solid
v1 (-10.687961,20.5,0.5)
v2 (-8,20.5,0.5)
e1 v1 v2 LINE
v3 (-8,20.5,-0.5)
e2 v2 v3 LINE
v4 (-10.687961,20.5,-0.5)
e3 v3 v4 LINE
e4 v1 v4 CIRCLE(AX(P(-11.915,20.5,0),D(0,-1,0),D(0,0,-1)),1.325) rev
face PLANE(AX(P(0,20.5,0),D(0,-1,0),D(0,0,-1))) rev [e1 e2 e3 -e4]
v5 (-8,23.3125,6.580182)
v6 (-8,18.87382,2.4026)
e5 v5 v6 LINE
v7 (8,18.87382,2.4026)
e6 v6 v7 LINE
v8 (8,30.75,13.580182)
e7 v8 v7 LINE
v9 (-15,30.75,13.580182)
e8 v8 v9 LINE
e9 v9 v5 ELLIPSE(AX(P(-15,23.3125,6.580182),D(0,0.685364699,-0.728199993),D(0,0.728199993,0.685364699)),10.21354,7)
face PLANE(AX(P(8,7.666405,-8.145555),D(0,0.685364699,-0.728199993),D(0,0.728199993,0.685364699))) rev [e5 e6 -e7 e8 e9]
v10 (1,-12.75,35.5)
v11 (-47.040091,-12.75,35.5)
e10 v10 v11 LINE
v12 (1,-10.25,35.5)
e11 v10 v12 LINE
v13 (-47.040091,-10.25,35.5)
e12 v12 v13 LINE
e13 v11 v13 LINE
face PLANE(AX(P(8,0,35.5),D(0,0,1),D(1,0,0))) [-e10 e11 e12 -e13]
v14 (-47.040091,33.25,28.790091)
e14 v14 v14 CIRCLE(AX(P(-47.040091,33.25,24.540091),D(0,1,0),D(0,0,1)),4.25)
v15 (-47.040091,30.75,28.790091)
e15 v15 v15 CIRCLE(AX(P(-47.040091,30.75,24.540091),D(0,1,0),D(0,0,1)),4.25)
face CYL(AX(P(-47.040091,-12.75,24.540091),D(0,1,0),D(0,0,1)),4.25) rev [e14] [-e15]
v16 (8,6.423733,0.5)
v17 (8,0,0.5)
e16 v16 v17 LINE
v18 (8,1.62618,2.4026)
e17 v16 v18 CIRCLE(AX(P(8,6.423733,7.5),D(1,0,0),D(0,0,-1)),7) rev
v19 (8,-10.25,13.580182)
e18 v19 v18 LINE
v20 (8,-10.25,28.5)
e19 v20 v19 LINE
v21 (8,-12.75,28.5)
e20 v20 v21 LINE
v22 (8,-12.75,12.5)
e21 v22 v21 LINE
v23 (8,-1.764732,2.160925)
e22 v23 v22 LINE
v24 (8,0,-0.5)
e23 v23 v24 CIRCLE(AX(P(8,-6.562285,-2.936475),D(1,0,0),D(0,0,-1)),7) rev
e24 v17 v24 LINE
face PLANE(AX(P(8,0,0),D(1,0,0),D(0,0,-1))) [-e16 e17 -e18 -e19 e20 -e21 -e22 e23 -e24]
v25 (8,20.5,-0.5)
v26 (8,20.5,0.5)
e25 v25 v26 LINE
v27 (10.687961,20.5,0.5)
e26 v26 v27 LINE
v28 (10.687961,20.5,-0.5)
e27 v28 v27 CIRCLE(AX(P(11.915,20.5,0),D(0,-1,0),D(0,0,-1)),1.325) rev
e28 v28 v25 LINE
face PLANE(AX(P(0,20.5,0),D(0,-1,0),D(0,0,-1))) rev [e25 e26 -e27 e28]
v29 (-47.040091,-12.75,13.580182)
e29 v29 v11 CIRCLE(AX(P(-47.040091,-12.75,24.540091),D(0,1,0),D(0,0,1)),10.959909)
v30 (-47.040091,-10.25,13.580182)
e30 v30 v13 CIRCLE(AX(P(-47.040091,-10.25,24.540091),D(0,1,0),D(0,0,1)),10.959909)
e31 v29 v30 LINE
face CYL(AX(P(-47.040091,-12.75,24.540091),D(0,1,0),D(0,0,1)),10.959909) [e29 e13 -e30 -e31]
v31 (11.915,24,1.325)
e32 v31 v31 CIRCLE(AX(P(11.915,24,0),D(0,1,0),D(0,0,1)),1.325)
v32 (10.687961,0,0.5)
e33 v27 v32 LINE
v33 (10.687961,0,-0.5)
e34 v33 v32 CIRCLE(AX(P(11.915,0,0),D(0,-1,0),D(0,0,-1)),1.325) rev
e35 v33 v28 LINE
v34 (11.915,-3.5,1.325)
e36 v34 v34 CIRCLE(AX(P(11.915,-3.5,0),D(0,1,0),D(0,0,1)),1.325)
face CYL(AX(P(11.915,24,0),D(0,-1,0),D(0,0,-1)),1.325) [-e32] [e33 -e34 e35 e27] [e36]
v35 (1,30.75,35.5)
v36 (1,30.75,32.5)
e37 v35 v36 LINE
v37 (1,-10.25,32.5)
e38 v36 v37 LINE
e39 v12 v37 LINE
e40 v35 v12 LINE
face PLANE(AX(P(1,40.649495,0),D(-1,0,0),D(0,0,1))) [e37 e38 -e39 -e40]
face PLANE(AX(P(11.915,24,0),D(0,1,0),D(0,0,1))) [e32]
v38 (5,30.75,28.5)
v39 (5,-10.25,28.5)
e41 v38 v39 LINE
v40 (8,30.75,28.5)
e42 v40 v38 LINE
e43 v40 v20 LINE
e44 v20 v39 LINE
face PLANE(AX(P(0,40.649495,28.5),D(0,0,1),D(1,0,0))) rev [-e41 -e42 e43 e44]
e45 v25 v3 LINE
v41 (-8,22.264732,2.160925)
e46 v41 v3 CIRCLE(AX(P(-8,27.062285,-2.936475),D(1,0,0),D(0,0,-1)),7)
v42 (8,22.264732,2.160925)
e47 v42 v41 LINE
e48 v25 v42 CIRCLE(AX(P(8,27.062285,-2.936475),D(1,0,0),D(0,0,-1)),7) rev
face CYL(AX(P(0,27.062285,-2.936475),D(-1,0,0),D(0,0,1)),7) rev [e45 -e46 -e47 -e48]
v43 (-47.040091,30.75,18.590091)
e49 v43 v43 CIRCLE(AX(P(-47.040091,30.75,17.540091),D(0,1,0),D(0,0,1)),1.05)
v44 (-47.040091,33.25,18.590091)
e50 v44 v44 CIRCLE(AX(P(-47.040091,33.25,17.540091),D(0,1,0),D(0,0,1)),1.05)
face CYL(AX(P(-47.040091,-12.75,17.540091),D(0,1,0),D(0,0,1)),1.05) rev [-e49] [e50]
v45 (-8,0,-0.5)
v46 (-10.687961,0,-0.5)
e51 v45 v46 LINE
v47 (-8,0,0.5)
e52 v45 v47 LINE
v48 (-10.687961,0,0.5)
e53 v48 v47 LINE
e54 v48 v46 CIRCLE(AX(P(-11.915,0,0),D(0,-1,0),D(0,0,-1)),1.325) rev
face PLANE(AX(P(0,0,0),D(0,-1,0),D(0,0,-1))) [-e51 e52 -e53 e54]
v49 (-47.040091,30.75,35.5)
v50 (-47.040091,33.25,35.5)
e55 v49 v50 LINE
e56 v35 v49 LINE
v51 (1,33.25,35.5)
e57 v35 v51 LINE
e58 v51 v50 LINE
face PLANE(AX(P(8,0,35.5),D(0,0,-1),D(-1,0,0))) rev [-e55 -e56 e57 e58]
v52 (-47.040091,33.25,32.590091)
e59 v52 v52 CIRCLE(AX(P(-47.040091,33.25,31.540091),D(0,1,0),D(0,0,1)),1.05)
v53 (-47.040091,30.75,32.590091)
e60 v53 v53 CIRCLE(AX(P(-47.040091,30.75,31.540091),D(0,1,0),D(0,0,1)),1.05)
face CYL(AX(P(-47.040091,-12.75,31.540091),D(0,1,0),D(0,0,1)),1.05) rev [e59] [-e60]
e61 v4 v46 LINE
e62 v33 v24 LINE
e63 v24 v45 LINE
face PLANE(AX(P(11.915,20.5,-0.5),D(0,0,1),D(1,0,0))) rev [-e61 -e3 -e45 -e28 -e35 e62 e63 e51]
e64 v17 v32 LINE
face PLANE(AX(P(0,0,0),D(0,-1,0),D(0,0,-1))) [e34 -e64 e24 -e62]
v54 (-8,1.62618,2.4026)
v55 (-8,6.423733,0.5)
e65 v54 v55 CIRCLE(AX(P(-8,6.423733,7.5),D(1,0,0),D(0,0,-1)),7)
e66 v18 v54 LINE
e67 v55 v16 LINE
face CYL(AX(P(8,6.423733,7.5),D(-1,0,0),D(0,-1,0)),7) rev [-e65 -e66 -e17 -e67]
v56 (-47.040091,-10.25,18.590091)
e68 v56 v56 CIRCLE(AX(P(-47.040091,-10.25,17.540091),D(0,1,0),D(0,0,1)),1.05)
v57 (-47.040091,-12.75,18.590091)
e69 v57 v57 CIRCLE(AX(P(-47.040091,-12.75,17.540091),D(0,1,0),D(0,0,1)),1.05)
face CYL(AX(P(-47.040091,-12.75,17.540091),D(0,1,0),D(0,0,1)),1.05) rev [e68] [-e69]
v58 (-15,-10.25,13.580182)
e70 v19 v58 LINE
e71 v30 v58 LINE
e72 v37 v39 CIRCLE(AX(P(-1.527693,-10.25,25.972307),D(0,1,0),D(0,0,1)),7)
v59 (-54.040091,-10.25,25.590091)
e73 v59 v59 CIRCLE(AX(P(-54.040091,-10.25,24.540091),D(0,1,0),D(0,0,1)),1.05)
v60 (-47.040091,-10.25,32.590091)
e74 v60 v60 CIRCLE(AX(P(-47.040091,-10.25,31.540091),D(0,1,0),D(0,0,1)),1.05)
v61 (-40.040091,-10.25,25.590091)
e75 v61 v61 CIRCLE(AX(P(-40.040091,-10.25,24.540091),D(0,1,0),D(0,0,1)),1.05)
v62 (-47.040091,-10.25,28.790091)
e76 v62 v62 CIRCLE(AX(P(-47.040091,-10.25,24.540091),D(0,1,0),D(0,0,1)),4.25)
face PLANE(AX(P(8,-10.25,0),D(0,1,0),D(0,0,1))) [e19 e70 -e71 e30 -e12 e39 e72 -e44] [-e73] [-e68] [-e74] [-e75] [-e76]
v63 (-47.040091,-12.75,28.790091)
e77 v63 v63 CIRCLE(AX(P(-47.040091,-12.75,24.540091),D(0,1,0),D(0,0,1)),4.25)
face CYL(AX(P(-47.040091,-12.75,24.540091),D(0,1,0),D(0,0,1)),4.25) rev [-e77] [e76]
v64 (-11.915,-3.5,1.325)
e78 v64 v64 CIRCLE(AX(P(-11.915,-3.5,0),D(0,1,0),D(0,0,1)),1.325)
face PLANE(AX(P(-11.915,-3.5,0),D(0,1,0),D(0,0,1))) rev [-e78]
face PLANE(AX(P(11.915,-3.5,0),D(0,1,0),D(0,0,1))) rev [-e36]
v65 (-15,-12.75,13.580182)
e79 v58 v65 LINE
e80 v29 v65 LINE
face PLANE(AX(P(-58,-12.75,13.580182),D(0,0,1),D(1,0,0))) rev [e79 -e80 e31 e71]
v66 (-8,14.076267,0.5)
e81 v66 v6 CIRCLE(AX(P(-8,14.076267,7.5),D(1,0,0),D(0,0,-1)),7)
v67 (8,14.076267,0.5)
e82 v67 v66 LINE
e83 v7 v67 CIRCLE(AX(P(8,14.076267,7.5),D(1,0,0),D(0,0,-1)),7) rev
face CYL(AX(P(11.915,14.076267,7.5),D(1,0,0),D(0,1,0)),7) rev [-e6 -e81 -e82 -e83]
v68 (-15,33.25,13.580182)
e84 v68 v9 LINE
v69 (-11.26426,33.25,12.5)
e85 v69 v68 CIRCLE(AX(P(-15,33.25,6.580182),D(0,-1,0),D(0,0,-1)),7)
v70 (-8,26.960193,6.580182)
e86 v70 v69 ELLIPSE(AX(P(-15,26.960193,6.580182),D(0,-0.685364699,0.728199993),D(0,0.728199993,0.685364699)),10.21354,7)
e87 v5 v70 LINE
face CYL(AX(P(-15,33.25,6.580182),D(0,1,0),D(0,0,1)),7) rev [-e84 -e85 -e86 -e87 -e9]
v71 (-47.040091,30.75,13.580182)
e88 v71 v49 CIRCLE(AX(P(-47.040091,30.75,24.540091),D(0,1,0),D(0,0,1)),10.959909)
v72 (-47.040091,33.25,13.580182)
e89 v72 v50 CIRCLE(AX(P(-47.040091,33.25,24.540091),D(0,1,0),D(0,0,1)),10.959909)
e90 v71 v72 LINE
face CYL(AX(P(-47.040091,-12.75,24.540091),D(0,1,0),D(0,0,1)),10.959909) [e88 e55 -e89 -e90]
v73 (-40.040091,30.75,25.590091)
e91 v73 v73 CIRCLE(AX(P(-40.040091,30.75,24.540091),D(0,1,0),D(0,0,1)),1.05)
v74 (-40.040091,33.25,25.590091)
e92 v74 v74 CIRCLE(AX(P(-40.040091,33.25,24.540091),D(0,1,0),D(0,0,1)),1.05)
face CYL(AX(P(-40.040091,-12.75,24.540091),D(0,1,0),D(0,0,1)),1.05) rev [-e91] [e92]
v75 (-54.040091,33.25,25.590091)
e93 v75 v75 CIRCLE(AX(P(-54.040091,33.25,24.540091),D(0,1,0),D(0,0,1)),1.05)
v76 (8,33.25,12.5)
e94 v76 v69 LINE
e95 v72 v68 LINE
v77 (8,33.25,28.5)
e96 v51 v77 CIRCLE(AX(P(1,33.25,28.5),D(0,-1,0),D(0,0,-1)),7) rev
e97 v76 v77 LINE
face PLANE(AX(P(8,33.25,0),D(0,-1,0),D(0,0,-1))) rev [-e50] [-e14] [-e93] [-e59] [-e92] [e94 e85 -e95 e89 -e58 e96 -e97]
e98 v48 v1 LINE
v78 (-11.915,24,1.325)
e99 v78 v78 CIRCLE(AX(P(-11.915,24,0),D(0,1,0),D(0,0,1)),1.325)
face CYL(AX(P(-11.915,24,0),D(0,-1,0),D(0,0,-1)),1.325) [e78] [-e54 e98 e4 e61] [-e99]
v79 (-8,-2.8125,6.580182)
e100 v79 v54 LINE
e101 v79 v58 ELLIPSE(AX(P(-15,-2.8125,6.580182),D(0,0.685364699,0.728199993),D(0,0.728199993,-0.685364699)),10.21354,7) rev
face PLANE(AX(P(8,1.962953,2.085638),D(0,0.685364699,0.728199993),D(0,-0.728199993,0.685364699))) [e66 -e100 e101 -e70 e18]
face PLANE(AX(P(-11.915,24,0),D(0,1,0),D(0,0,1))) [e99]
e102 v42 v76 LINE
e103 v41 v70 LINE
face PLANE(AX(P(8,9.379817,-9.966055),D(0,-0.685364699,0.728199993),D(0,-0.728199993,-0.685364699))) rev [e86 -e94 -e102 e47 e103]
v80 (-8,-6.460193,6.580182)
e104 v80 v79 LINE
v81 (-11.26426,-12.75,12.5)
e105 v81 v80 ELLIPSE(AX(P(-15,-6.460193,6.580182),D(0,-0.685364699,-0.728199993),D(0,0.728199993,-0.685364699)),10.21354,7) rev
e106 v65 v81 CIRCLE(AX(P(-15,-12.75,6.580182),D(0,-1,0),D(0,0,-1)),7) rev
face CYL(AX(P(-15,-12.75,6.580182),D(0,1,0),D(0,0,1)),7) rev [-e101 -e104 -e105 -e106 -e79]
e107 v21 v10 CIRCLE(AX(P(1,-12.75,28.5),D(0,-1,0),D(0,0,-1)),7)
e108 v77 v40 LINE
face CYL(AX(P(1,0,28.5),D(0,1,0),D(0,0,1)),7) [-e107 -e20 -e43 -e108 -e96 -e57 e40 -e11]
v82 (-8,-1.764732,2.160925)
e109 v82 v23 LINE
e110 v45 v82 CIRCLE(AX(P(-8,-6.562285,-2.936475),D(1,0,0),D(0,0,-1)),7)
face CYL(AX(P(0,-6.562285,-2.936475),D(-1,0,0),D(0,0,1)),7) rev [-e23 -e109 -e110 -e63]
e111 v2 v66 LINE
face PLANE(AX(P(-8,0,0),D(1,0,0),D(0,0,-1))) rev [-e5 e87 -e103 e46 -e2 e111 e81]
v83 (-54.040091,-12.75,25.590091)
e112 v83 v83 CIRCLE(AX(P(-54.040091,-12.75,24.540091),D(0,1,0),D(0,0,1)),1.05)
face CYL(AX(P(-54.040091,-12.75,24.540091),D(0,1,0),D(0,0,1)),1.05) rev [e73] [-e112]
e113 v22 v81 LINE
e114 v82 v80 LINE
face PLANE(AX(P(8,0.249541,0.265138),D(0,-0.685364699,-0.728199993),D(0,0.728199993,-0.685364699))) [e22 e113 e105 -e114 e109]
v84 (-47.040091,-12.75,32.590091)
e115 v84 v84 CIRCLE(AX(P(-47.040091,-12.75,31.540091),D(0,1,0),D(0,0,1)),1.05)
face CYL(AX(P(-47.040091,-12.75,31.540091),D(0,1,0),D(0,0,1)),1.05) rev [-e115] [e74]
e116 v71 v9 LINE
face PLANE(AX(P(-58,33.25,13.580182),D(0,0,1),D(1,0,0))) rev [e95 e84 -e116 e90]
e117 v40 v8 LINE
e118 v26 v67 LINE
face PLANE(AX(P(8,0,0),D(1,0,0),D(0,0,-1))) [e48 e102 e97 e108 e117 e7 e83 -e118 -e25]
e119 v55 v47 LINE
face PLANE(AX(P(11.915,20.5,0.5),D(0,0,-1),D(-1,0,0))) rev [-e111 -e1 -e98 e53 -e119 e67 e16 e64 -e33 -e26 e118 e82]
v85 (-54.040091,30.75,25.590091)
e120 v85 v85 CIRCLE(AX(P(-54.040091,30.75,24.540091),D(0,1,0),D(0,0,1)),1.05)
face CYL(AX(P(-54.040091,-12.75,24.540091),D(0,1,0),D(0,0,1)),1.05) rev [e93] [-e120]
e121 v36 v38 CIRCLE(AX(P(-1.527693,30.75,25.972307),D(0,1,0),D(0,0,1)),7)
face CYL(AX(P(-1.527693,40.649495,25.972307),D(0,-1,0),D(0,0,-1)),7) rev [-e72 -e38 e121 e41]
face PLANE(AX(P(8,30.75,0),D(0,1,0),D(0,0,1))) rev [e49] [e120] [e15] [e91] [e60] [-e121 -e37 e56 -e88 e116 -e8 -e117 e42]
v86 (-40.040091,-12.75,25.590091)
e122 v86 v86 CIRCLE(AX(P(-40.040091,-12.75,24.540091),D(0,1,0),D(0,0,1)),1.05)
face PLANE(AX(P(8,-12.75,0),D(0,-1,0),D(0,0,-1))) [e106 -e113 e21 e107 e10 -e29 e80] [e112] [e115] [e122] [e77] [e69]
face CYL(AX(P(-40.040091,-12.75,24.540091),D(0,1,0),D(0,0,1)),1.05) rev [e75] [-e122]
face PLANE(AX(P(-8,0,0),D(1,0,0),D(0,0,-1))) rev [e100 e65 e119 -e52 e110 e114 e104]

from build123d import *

# Parameters (mm, degrees)
SKETCH1_W           = 23.83
SKETCH1_H           = 1
BOSS_EXTRUDE1_DEPTH = 20.5
SKETCH2_R           = 1.325
BOSS_EXTRUDE2_DEPTH = 13.75
BOSS_EXTRUDE4_DEPTH = 8
SKETCH5_W           = 21.919818374
SKETCH5_H           = 2.5
BOSS_EXTRUDE5_DEPTH = 50
SKETCH6_R           = 4.25
SKETCH6_R_2         = 1.05
CUT_EXTRUDE1_DEPTH  = 83.099025573
FILLET1_R           = 7
FILLET2_R           = 7
FILLET3_R           = 7
BOSS_EXTRUDE6_START = 41
BOSS_EXTRUDE6_DEPTH = 41


with BuildPart() as part:
    # Sketch1 → Boss-Extrude1 (new body)
    with BuildSketch(Plane(origin=(0, 0, 0), x_dir=(1, 0, 0), z_dir=(0, 1, 0))):
        Rectangle(SKETCH1_W, SKETCH1_H)
    extrude(amount=BOSS_EXTRUDE1_DEPTH)

    # Sketch2 → Boss-Extrude2 (add, symmetric)
    with BuildSketch(Plane(origin=(0, 10.25, 0), x_dir=(1, 0, 0), z_dir=(0, 1, 0))):
        with Locations(Location((-11.915, 0, 0), (0, 0, 270))):
            Circle(SKETCH2_R)
        with Locations(Location((11.915, 0, 0), (0, 0, 270))):
            Circle(SKETCH2_R)
    extrude(amount=BOSS_EXTRUDE2_DEPTH, both=True)

    # Sketch4 → Boss-Extrude4 (add, symmetric)
    with BuildSketch(Plane(origin=(0, 0, 0), x_dir=(0, 0, -1), z_dir=(1, 0, 0))):
        Polygon((-0.5, 16.852307022), (-0.5, 20.5), (-12.5, 33.25), (-35.5, 33.25), (-35.5, 30.75), (-13.580181626, 30.75), align=None)
        Polygon((-0.5, 0), (-0.5, 3.647692978), (-13.580181626, -10.25), (-35.5, -10.25), (-35.5, -12.75), (-12.5, -12.75), align=None)
    extrude(amount=BOSS_EXTRUDE4_DEPTH, both=True)

    # Sketch5 → Boss-Extrude5 (add)
    with BuildSketch(Plane.ZY.offset(8)):
        with Locations((24.540090813, 32)):
            Rectangle(SKETCH5_W, SKETCH5_H)
        with Locations((24.540090813, -11.5)):
            Rectangle(SKETCH5_W, SKETCH5_H)
    extrude(amount=BOSS_EXTRUDE5_DEPTH)

    # Sketch6 → Cut-Extrude1 (cut, through all)
    with BuildSketch(Plane(origin=(0, 33.25, 0), x_dir=(1, 0, 0), z_dir=(0, 1, 0))):
        with Locations(Location((-47.040090813, -24.540090813, 0), (0, 0, 270))):
            Circle(SKETCH6_R)
        with Locations(Location((-54.040090813, -24.540090813, 0), (0, 0, 270))):
            Circle(SKETCH6_R_2)
        with Locations(Location((-47.040090813, -17.540090813, 0), (0, 0, 270))):
            Circle(SKETCH6_R_2)
        with Locations(Location((-40.040090813, -24.540090813, 0), (0, 0, 270))):
            Circle(SKETCH6_R_2)
        with Locations(Location((-47.040090813, -31.540090813, 0), (0, 0, 270))):
            Circle(SKETCH6_R_2)
        with BuildLine():
            ThreePointArc((-58, -24.540090813), (-54.78991692, -16.790264706), (-47.040090813, -13.580181626))
            Line((-47.040090813, -13.580181626), (-58, -13.580181626))
            Line((-58, -13.580181626), (-58, -24.540090813))
        make_face()
        with BuildLine():
            ThreePointArc((-47.040090813, -35.5), (-54.78991692, -32.28991692), (-58, -24.540090813))
            Line((-58, -24.540090813), (-58, -35.5))
            Line((-58, -35.5), (-47.040090813, -35.5))
        make_face()
    extrude(amount=-CUT_EXTRUDE1_DEPTH, mode=Mode.SUBTRACT)

    # Fillet1
    # the kernel refuses this fillet: 7 mm, written as the material it adds along each edge
    with BuildSketch(Plane(origin=(-8, -12.75, 13.580181626), x_dir=(-1, 0, 0), z_dir=(0, 1, 0))) as fillet1_piece_1_section:
        with BuildLine():
            CenterArc((FILLET1_R, -FILLET1_R), FILLET1_R, 90, 90)
            Line((0, -FILLET1_R), (0, 0))
            Line((0, 0), (FILLET1_R, 0))
        make_face()
    fillet1_piece_1 = extrude(amount=2.5, mode=Mode.PRIVATE)
    fillet1_piece_1 = split(fillet1_piece_1, bisect_by=Plane(origin=(-10.020174451, -12.153760937, 11.938833823), z_dir=(0, 0.6853646990049913, 0.7281999926928027)), keep=Keep.TOP, mode=Mode.PRIVATE)
    fillet1_piece_1 = split(fillet1_piece_1, bisect_by=Plane(origin=(-10.020174451, -10.440349189, 13.759333804), z_dir=(0, -0.685364699004991, -0.7281999926928029)), keep=Keep.TOP, mode=Mode.PRIVATE)
    add(fillet1_piece_1)
    with BuildSketch(Plane(origin=(-8, -12.75, 13.580181626), x_dir=(-1, 0, 0), z_dir=(0, 1, 0))) as fillet1_piece_2_section:
        with BuildLine():
            CenterArc((FILLET1_R, -FILLET1_R), FILLET1_R, 90, 90)
            Line((0, -FILLET1_R), (0, 0))
            Line((0, 0), (FILLET1_R, 0))
        make_face()
    fillet1_piece_2 = extrude(amount=20, mode=Mode.PRIVATE)
    fillet1_piece_2 = split(fillet1_piece_2, bisect_by=Plane(origin=(-8.816209607, -9.698679662, 9.628169093), z_dir=(0, 0.6853646990049913, 0.7281999926928027)), keep=Keep.TOP, mode=Mode.PRIVATE)
    fillet1_piece_2 = split(fillet1_piece_2, bisect_by=Plane(origin=(-8.816209607, -10.25, 10.809130305), z_dir=(0, 1, 0)), keep=Keep.TOP, mode=Mode.PRIVATE)
    fillet1_piece_2 = split(fillet1_piece_2, bisect_by=Plane(origin=(-8.816209607, -7.985267914, 11.448669075), z_dir=(0, -0.685364699004991, -0.7281999926928029)), keep=Keep.TOP, mode=Mode.PRIVATE)
    add(fillet1_piece_2)
    with BuildSketch(Plane(origin=(-8, 33.25, 13.580181626), x_dir=(0, 0, -1), z_dir=(0, -1, 0))) as fillet1_piece_3_section:
        with BuildLine():
            CenterArc((FILLET1_R, -FILLET1_R), FILLET1_R, 90, 90)
            Line((0, -FILLET1_R), (0, 0))
            Line((0, 0), (FILLET1_R, 0))
        make_face()
    fillet1_piece_3 = extrude(amount=2.5, mode=Mode.PRIVATE)
    fillet1_piece_3 = split(fillet1_piece_3, bisect_by=Plane(origin=(-10.020174451, 32.653760936, 11.938833823), z_dir=(0, -0.6853646990049912, 0.7281999926928028)), keep=Keep.TOP, mode=Mode.PRIVATE)
    fillet1_piece_3 = split(fillet1_piece_3, bisect_by=Plane(origin=(-10.020174451, 30.940349189, 13.759333804), z_dir=(0, 0.6853646990049909, -0.7281999926928031)), keep=Keep.TOP, mode=Mode.PRIVATE)
    add(fillet1_piece_3)
    with BuildSketch(Plane(origin=(-8, 33.25, 13.580181626), x_dir=(0, 0, -1), z_dir=(0, -1, 0))) as fillet1_piece_4_section:
        with BuildLine():
            CenterArc((FILLET1_R, -FILLET1_R), FILLET1_R, 90, 90)
            Line((0, -FILLET1_R), (0, 0))
            Line((0, 0), (FILLET1_R, 0))
        make_face()
    fillet1_piece_4 = extrude(amount=20, mode=Mode.PRIVATE)
    fillet1_piece_4 = split(fillet1_piece_4, bisect_by=Plane(origin=(-8.816209616, 30.198679665, 9.628169097), z_dir=(0, -0.6853646990049912, 0.7281999926928028)), keep=Keep.TOP, mode=Mode.PRIVATE)
    fillet1_piece_4 = split(fillet1_piece_4, bisect_by=Plane(origin=(-8.816209616, 28.485267918, 11.448669078), z_dir=(0, 0.6853646990049909, -0.7281999926928031)), keep=Keep.TOP, mode=Mode.PRIVATE)
    fillet1_piece_4 = split(fillet1_piece_4, bisect_by=Plane(origin=(-8.816209616, 30.75, 10.809130308), z_dir=(0, -1, 0)), keep=Keep.TOP, mode=Mode.PRIVATE)
    add(fillet1_piece_4)
    # the kernel refuses this fillet: 7 mm, written as the material it takes off along each edge
    with BuildSketch(Plane(origin=(8, 7.25, 35.5), x_dir=(0, 0, -1), z_dir=(0, -1, 0))) as fillet1_2_piece_1:
        with BuildLine():
            CenterArc((FILLET1_R, -FILLET1_R), FILLET1_R, 90, 90)
            Line((0, -FILLET1_R), (0, 0))
            Line((0, 0), (FILLET1_R, 0))
        make_face()
    extrude(amount=37.5, mode=Mode.SUBTRACT)
    with BuildSketch(Plane(origin=(8, 50.75, 35.5), x_dir=(-1, 0, 0), z_dir=(0, -1, 0))) as fillet1_2_piece_2:
        with BuildLine():
            CenterArc((FILLET1_R, FILLET1_R), FILLET1_R, 180, 90)
            Line((0, FILLET1_R), (0, 0))
            Line((0, 0), (FILLET1_R, 0))
        make_face()
    extrude(amount=37.5, mode=Mode.SUBTRACT)

    # Fillet2
    fillet2_edges = [part.edges().sort_by_distance(p)[0] for p in [
        (0, 16.852307022, 0.5),
        (0, 3.647692978, 0.5),
    ]]
    fillet(fillet2_edges, radius=FILLET2_R)

    # Fillet3
    # the kernel refuses this fillet: 7 mm, written as the material it adds along each edge
    with BuildSketch(Plane(origin=(-8, 20.5, 0.5), x_dir=(0, 0.7281999926925888, 0.6853646990052185), z_dir=(1, 0, 0))) as fillet3_piece_1:
        with BuildLine():
            CenterArc((2.423417163, -7), FILLET3_R, 90, 26.366519243)
            Line((-0.685364699, -0.728199993), (0, 0))
            Line((0, 0), (2.423417163, 0))
        make_face()
    extrude(amount=16)
    with BuildSketch(Plane(origin=(8, 0, 0.5), x_dir=(0, 0, -1), z_dir=(-1, 0, 0))) as fillet3_piece_2:
        with BuildLine():
            CenterArc((3.436475374, 6.562285254), FILLET3_R, 223.264295411, 26.366519243)
            Line((-1.660924575, 1.764732361), (0, 0))
            Line((0, 0), (1, 0))
        make_face()
    extrude(amount=16)

    # Sketch8 → Boss-Extrude6 (add)
    with BuildSketch(Plane(origin=(0, -10.25, 0), x_dir=(1, 0, 0), z_dir=(0, 1, 0)).offset(BOSS_EXTRUDE6_START)):
        with BuildLine():
            ThreePointArc((1, -35.5), (5.949747468, -33.449747468), (8, -28.5))
            Line((8, -28.5), (5, -28.5))
            ThreePointArc((5, -28.5), (3.422054899, -30.922054899), (1, -32.5))
            Line((1, -32.5), (1, -35.5))
        make_face()
    extrude(amount=-BOSS_EXTRUDE6_DEPTH)


solid = part.part
